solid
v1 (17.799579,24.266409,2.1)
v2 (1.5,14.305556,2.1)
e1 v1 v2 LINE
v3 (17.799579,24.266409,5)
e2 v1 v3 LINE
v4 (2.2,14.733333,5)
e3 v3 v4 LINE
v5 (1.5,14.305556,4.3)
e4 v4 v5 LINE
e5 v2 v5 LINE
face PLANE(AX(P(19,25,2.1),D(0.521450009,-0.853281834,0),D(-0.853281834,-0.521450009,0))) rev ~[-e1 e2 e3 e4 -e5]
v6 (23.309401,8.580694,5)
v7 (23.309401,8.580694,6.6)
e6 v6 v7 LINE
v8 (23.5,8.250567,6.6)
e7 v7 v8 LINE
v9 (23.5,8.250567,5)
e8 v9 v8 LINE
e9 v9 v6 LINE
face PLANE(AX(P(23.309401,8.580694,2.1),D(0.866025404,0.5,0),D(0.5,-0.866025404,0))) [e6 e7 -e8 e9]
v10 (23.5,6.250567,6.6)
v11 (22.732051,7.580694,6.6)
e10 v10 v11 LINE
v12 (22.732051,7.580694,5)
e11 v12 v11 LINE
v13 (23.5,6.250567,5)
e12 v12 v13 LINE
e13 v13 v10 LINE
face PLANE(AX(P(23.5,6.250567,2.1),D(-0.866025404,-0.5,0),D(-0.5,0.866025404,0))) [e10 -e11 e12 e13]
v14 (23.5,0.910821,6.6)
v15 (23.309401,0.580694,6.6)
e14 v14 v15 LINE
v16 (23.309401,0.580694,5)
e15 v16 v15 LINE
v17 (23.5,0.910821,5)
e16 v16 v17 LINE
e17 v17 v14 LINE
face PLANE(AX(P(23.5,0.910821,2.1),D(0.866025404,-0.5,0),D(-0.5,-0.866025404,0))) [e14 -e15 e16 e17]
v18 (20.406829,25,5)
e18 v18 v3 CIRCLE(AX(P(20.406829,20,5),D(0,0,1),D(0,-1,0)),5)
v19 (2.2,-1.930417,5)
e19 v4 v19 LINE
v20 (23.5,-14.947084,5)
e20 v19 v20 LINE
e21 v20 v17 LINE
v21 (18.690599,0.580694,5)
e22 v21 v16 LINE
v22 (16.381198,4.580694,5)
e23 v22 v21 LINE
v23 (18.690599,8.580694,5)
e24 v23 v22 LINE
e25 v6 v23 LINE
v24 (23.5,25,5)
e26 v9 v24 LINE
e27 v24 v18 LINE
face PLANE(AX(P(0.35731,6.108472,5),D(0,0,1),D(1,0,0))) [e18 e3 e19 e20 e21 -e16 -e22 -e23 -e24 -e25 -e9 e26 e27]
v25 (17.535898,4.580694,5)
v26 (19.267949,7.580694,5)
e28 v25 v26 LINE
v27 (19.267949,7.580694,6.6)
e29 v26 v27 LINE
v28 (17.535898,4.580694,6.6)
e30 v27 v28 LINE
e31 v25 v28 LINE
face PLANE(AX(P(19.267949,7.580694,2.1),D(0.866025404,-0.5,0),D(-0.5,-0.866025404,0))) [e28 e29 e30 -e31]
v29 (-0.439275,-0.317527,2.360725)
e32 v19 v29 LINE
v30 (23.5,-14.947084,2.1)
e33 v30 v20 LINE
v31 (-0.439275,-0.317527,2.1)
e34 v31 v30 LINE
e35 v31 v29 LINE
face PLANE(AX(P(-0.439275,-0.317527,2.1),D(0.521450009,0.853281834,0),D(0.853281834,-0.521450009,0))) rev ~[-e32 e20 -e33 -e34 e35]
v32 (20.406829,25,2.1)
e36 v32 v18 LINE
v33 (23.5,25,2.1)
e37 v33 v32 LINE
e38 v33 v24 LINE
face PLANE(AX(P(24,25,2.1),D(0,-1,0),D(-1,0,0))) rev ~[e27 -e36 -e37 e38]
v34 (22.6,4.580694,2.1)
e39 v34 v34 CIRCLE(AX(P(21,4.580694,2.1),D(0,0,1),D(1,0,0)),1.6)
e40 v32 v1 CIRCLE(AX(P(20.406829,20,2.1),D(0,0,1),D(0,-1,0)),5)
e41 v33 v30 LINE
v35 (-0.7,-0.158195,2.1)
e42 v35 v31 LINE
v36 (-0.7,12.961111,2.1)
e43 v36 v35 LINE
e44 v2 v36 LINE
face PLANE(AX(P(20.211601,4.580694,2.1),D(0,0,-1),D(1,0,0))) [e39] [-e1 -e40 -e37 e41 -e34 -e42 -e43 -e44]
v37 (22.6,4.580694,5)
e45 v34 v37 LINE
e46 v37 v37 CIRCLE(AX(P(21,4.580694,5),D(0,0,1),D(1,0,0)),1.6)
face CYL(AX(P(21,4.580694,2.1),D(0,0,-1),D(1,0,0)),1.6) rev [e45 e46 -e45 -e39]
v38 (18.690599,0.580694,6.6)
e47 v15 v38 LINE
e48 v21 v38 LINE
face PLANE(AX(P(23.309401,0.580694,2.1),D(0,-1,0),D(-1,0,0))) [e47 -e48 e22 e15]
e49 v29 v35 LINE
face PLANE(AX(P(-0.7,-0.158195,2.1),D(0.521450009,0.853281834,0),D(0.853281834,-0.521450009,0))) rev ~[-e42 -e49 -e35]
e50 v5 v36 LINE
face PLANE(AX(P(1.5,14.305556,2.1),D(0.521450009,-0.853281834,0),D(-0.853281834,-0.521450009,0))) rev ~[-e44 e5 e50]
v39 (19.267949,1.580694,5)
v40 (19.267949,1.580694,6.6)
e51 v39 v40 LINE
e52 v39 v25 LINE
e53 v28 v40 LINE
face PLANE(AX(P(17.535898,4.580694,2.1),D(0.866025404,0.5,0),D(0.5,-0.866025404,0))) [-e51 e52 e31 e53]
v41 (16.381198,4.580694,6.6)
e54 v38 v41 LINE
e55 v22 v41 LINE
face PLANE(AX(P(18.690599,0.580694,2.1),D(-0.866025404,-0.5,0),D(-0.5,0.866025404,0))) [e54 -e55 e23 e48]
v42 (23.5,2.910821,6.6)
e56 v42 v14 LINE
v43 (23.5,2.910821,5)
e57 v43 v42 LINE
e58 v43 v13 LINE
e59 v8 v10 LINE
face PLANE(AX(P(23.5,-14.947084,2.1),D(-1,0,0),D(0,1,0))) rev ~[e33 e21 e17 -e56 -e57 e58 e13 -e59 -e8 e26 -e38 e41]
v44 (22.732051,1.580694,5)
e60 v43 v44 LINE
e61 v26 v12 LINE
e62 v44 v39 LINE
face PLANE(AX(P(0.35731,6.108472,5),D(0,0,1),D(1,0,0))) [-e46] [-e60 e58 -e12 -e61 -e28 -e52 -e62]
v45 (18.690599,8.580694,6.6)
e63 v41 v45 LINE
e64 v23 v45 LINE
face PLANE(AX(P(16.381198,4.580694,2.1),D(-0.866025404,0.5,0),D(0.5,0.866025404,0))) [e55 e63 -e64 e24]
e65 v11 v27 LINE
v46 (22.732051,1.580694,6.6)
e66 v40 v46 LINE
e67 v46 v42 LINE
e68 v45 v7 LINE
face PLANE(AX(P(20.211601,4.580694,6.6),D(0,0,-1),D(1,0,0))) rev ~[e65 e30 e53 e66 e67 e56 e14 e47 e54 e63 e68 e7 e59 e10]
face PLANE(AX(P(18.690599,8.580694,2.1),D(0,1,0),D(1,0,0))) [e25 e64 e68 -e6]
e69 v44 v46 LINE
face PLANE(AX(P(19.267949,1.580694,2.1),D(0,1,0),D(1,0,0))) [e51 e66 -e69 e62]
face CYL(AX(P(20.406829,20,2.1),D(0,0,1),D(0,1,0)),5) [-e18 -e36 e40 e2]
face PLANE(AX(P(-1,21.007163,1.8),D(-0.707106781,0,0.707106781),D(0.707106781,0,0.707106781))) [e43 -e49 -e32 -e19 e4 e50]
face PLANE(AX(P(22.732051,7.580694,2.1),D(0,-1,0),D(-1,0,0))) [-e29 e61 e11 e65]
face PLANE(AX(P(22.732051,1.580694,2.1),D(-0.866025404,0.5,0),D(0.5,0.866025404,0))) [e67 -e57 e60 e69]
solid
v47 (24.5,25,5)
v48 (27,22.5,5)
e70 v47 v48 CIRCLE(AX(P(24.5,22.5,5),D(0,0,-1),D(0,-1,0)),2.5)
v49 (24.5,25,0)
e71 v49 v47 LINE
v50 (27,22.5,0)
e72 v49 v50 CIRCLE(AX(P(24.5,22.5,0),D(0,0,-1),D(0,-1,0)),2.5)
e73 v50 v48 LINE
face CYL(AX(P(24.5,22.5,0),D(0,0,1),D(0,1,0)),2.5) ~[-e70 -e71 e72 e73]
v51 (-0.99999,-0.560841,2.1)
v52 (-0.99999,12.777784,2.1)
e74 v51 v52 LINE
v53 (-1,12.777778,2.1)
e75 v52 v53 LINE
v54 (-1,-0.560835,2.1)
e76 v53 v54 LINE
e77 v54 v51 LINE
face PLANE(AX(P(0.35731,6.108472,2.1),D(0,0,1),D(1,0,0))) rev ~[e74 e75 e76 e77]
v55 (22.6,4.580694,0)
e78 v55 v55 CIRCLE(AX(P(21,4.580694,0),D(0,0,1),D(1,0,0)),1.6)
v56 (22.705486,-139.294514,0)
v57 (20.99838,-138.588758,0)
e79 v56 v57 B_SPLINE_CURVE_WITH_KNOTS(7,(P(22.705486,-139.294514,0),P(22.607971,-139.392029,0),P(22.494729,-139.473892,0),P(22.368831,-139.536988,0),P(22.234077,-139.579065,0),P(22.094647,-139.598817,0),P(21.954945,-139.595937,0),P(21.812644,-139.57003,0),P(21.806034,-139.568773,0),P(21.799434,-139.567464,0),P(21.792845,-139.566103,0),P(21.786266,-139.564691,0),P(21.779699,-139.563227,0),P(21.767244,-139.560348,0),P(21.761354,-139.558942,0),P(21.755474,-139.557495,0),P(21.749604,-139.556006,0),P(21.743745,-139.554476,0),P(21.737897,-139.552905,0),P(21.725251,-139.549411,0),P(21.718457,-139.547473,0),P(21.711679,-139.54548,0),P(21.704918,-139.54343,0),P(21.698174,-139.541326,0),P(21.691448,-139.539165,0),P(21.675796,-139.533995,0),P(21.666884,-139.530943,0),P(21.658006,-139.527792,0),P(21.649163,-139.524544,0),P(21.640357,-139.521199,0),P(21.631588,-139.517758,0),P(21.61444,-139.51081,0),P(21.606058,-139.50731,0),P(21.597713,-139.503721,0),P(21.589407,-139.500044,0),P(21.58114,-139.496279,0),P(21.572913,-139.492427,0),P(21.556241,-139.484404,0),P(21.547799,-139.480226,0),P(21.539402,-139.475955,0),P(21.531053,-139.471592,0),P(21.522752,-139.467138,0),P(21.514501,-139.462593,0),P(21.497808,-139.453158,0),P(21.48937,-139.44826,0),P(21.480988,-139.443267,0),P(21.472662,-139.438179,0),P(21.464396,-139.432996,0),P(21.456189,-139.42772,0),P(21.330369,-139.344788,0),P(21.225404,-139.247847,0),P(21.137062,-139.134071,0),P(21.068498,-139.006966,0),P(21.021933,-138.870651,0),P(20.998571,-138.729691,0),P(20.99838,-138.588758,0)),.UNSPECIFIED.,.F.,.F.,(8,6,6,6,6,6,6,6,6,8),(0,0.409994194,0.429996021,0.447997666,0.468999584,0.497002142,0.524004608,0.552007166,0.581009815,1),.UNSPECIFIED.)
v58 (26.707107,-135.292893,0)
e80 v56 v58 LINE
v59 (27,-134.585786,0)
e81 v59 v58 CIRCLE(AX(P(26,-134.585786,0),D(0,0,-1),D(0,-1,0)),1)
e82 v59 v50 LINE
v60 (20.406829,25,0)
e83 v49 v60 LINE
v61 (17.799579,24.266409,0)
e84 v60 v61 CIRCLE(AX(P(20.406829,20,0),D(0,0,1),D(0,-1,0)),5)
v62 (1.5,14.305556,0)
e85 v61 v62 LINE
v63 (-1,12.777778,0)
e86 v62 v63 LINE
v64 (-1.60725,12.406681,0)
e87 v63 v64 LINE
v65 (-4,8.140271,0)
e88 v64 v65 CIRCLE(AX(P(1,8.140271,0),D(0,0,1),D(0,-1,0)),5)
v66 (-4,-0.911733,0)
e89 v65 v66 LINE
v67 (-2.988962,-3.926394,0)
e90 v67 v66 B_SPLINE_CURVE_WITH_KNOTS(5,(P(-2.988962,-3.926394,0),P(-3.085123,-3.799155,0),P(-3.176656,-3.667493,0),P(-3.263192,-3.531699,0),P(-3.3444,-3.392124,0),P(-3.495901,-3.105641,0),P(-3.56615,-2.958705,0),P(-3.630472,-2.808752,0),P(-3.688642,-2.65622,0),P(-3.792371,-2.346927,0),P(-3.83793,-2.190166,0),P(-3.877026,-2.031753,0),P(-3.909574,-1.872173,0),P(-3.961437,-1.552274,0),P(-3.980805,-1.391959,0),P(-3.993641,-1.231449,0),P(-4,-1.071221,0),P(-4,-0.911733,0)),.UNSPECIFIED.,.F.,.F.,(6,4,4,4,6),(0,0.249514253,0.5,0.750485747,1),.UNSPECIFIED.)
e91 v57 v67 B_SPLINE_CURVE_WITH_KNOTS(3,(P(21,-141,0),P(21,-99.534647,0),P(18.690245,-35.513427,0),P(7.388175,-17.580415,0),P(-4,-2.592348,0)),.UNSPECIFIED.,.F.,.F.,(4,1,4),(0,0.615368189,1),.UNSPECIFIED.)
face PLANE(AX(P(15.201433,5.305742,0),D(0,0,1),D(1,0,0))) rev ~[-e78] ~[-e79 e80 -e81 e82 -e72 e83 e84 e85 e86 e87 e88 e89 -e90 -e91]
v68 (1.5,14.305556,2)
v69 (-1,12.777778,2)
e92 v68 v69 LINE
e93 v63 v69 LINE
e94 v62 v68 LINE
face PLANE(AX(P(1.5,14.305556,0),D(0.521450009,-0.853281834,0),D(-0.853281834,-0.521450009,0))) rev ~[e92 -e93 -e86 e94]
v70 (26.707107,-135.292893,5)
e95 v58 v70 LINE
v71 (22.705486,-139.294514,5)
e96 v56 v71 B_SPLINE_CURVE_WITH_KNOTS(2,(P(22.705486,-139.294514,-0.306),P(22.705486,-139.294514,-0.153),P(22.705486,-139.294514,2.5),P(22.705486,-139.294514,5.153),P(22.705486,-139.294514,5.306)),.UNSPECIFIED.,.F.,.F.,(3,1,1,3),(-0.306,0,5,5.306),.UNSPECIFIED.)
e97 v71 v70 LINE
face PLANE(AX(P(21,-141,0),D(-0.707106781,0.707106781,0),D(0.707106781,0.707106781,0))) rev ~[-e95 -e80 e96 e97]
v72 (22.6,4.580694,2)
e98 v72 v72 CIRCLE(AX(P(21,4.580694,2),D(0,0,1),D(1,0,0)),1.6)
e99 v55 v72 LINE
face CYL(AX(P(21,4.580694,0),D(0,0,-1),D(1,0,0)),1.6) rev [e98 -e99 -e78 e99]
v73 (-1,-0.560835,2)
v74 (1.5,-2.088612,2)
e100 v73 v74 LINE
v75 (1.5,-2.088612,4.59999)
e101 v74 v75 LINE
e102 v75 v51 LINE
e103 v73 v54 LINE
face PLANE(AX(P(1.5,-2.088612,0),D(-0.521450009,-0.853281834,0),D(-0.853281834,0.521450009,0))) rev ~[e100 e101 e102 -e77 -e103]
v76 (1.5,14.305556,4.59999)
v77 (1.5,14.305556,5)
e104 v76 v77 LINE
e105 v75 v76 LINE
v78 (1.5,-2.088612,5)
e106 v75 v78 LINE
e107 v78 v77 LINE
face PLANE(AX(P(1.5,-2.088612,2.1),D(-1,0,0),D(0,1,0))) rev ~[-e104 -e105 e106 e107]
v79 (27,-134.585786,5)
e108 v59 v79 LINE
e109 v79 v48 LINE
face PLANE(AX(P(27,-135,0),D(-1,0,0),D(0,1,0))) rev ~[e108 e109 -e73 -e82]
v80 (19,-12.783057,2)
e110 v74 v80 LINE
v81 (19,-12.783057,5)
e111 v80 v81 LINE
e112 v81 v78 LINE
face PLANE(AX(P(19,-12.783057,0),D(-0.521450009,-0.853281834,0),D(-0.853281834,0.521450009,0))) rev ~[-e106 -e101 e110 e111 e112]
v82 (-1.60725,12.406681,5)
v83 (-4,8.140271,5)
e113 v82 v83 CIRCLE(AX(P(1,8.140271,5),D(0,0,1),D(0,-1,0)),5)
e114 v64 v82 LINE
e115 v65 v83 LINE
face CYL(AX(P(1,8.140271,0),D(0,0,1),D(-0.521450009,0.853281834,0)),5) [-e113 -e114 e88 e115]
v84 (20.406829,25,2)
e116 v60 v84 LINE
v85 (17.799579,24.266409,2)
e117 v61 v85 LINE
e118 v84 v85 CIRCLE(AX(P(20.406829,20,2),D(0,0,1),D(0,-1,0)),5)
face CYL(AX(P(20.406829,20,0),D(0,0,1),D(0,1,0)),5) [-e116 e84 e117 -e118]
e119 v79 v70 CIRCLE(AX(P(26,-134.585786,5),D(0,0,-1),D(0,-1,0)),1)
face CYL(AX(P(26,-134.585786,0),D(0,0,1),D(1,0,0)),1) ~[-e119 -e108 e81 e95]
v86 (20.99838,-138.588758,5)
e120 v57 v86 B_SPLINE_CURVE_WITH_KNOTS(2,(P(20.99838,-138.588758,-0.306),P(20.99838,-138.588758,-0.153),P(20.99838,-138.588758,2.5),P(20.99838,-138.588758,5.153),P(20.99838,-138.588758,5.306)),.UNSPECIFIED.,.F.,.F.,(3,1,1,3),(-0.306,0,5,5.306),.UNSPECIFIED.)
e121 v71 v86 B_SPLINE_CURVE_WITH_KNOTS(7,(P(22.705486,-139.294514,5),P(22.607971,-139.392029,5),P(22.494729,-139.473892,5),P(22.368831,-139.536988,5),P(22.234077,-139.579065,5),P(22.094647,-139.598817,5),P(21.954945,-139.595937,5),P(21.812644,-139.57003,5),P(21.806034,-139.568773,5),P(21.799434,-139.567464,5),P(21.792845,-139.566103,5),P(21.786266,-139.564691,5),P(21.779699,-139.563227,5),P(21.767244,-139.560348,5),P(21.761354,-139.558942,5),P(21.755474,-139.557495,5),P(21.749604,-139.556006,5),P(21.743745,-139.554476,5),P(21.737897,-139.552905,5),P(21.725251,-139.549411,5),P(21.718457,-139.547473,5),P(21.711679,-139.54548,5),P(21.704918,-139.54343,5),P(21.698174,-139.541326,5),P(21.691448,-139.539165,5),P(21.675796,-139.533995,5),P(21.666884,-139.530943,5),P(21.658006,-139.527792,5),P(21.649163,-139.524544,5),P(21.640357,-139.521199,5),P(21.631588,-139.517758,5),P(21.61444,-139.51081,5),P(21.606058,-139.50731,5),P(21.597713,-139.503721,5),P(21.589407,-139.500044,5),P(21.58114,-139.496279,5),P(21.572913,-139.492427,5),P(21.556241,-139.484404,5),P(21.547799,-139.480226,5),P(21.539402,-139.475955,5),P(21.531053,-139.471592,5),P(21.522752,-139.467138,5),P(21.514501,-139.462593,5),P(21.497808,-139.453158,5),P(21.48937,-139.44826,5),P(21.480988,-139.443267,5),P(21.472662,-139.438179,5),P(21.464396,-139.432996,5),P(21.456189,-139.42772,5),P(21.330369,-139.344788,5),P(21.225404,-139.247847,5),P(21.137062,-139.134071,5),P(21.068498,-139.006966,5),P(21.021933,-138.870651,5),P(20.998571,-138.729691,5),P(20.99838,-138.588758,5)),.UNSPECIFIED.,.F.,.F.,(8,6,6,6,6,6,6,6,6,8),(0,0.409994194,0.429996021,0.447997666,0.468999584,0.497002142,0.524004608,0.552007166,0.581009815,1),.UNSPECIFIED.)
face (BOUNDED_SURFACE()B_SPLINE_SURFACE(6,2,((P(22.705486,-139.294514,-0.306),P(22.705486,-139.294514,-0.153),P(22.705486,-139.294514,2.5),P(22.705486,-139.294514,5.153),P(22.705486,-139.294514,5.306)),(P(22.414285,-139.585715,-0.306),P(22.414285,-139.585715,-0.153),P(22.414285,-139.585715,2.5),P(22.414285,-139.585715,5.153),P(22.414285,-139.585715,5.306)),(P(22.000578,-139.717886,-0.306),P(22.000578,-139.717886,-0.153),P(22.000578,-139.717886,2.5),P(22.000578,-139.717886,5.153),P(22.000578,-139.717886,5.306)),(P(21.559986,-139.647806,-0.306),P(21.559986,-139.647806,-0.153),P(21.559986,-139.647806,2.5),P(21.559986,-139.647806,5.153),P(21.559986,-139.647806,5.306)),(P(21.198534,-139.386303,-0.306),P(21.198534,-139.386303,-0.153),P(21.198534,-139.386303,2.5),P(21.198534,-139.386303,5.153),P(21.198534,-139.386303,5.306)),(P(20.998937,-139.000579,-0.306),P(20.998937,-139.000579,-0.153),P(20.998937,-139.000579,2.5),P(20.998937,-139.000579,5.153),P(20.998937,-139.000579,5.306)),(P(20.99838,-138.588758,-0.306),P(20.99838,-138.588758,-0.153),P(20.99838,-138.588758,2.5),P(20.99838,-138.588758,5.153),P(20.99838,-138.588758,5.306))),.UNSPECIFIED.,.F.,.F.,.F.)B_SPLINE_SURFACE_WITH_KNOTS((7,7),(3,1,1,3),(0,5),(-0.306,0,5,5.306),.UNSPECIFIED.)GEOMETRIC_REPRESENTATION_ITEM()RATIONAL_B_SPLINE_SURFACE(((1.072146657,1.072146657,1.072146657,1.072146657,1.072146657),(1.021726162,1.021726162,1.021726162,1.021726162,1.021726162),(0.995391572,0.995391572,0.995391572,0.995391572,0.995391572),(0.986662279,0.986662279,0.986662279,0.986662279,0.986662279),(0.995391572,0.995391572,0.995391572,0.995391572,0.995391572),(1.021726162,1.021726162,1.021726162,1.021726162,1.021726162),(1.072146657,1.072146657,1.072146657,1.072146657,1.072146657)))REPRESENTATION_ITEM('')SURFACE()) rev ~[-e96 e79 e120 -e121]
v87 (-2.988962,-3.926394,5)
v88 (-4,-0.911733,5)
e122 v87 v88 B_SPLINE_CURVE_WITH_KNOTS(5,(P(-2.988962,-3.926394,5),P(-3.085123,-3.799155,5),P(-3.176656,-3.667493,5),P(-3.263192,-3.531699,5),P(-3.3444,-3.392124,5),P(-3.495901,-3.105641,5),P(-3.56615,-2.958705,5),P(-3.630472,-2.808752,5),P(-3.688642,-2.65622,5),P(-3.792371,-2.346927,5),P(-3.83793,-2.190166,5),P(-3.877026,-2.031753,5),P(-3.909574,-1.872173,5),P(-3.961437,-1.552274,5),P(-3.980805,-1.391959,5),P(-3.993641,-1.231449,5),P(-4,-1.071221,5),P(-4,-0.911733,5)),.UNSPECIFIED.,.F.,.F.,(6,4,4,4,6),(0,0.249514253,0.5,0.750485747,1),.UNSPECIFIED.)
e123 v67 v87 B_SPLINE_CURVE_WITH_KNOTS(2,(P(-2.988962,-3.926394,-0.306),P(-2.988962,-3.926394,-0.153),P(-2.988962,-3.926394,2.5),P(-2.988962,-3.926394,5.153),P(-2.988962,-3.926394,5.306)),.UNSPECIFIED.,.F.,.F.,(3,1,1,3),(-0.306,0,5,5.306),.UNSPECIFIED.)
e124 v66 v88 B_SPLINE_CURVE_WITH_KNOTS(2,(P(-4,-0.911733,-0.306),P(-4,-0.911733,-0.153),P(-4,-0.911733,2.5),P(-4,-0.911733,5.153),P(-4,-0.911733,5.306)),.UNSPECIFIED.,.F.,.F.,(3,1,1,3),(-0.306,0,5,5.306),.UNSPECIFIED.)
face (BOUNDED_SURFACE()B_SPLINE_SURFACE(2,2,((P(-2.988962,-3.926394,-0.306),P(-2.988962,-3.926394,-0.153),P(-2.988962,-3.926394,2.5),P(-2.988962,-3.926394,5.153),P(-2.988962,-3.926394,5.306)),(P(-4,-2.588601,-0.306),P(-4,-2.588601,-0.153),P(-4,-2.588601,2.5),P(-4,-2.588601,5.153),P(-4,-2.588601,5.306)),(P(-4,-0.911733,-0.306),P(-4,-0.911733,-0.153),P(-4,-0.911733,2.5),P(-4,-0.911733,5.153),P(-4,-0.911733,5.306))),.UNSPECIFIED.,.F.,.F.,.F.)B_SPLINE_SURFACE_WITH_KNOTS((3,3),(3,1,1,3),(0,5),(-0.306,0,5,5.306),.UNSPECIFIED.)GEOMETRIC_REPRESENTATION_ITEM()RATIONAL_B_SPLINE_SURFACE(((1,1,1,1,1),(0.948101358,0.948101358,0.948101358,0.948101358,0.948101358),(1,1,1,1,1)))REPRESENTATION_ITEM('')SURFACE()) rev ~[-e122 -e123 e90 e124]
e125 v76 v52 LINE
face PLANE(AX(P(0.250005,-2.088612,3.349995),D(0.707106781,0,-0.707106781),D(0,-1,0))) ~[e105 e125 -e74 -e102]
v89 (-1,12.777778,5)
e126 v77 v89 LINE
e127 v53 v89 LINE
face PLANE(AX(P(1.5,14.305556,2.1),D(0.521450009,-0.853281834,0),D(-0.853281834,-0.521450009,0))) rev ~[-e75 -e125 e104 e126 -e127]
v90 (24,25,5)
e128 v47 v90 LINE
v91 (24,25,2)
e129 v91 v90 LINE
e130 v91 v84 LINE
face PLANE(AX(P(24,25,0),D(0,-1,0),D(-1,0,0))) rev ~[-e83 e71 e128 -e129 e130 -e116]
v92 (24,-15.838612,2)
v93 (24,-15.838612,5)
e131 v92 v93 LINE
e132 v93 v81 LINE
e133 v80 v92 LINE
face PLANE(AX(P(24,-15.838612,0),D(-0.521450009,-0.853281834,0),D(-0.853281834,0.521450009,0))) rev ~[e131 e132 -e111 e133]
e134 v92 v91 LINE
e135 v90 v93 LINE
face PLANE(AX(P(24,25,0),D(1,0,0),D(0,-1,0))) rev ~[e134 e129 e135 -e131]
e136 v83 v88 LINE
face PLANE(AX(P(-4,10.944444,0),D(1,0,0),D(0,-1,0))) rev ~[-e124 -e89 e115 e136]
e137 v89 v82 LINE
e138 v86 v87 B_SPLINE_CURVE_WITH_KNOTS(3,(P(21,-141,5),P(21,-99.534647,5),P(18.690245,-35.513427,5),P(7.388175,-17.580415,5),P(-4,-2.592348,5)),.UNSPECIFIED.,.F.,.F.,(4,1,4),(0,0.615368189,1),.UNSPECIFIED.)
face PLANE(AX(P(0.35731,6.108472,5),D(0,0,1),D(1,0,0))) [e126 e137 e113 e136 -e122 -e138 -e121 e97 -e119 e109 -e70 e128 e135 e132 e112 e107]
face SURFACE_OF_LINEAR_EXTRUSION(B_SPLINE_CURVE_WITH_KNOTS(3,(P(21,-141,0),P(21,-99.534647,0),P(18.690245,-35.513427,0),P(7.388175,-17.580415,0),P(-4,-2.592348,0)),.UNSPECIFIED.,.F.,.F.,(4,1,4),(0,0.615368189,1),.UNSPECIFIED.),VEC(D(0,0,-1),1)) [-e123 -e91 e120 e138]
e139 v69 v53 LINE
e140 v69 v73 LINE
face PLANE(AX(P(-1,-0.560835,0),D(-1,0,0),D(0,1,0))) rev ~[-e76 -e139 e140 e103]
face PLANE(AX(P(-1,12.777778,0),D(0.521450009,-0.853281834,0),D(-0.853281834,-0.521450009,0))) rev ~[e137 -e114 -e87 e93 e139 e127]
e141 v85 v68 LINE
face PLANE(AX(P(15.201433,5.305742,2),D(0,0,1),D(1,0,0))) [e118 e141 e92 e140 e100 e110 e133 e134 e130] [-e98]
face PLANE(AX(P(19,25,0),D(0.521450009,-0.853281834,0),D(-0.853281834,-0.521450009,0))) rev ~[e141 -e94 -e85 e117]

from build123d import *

# Parameters (mm, degrees)
F0_R        = 1.6
F1_DEPTH    = 2
F2_DEPTH    = 5
F3_START    = 2.1
F3_DEPTH    = 2.9
F4_SIZE     = 2.49999
F5_R        = 5
F6_R        = 2.5
F7_R        = 1
F8_START    = 2.1
F8_DEPTH    = 2.9
F9_T1_DEPTH = 29.797383518
F11_DEPTH   = 2.9
F12_DEPTH   = 4.5
F13_R       = 5


# Not quite as in the source:
# - a fillet or chamfer that OpenCascade refuses, or shapes differently, is made with other operations: its cross-section is extruded or revolved along the edge and cut away or added
# - a fillet or chamfer is up to 0.001 mm smaller than in the source, because OpenCascade refuses the exact size


with BuildPart() as f1:
    # F0 (on Top) → F1 (new body)
    with BuildSketch(Plane.XY):
        Polygon((1.5, 14.3055555556), (1.5, -2.088612395), (19, -12.7830568394), (24, -15.838612395), (24, 25), (19, 25), align=None)
        with Locations((21, 4.5806938025)):
            Circle(F0_R, mode=Mode.SUBTRACT)
        Polygon((-1, 12.7777777778), (-1, -0.5608346172), (1.5, -2.088612395), (1.5, 14.3055555556), align=None)
    extrude(amount=F1_DEPTH)

    # F0 (on Top) → F2 (join)
    with BuildSketch(Plane.XY):
        with BuildLine():
            Line((1.5, -2.088612395), (-1, -0.5608346172))
            Line((-1, -0.5608346172), (-1, 12.7777777778))
            Line((-1, 12.7777777778), (-4, 10.9444444444))
            Line((-4, 10.9444444444), (-4, -2.5923480172))
            add(Edge.make_bspline(
                [(21, -141), (21, -99.5346466722), (18.6902447603, -35.5134267653), (7.388175394, -17.5804150979), (-4, -2.5923480172)],
                knots=[0, 0, 0, 0, 0.6153681888, 1, 1, 1, 1], degree=3))
            Line((21, -141), (27, -135))
            Line((27, -135), (27, 25))
            Line((27, 25), (24, 25))
            Line((24, 25), (24, -15.838612395))
            Line((24, -15.838612395), (19, -12.7830568394))
            Line((19, -12.7830568394), (1.5, -2.088612395))
        make_face()
    extrude(amount=F2_DEPTH)

    # F0 (on Top) → F3 (join)
    with BuildSketch(Plane.XY.offset(F3_START)):
        Polygon((-1, 12.7777777778), (-1, -0.5608346172), (1.5, -2.088612395), (1.5, 14.3055555556), align=None)
    extrude(amount=F3_DEPTH)

    # F4 (size 2.5 in the source; OpenCascade refuses exactly that, so slightly less here)
    f4_edges = [f1.edges().sort_by_distance(p)[0] for p in [
        (1.5, 6.108472, 2.1),
    ]]
    chamfer(f4_edges, length=F4_SIZE)

    # F5
    f5_edges = [f1.edges().sort_by_distance(p)[0] for p in [
        (-4, 10.944444, 2.5),
        (19, 25, 1),
        (-4, -2.592348, 2.5),
    ]]
    fillet(f5_edges, radius=F5_R)

    # F6
    f6_edges = [f1.edges().sort_by_distance(p)[0] for p in [
        (27, 25, 2.5),
    ]]
    fillet(f6_edges, radius=F6_R)

    # F7
    f7_edges = [f1.edges().sort_by_distance(p)[0] for p in [
        (27, -135, 2.5),
        (21, -141, 2.5),
    ]]
    fillet(f7_edges, radius=F7_R)


with BuildPart() as f8:
    # F0 (on Top) → F8 (new body)
    with BuildSketch(Plane.XY.offset(F8_START)):
        Polygon((-1, 12.7777777778), (-1, -0.5608346172), (1.5, -2.088612395), (1.5, 14.3055555556), align=None)
        Polygon((1.5, 14.3055555556), (1.5, -2.088612395), (19, -12.7830568394), (24, -15.838612395), (24, 25), (19, 25), align=None)
        with Locations((21, 4.5806938025)):
            Circle(F0_R, mode=Mode.SUBTRACT)
    extrude(amount=F8_DEPTH)

    # F9: chamfer of 3.2 on 1 edges, made by hand

    # F9_s2 → F9_t1 (cut)
    with BuildSketch(Plane.XZ.offset(-21.0071633393)):
        Polygon((-1, 1.8), (2.2, 5), (-1, 5), align=None)
    extrude(amount=F9_T1_DEPTH, mode=Mode.SUBTRACT)

    # F10 (on face) → F11 (cut, through all)
    with BuildSketch(Plane(origin=(0, 0, 2.1), x_dir=(1, 0, 0), z_dir=(0, 0, -1))):
        Polygon((24, -1.7768462252), (24, 15.838612395), (-0.7, 0.7441679505), (-0.7, 0.1581950864), (-0.4392749953, 0.3175270337), (23.5, 14.9470839753), (23.5, -0.9108208214), align=None)
        Polygon((24, -25), (24, -7.3845413798), (23.5, -8.2505667836), (23.5, -25), align=None)
        Polygon((24, -3.7768462252), (24, -1.7768462252), (23.5, -0.9108208214), (23.5, -2.9108208214), align=None)
        Polygon((24, -7.3845413798), (24, -5.3845413798), (23.5, -6.2505667836), (23.5, -8.2505667836), align=None)
        Polygon((24, -5.3845413798), (24, -3.7768462252), (23.5, -2.9108208214), (23.5, -6.2505667836), align=None)
    extrude(amount=-F11_DEPTH, mode=Mode.SUBTRACT)

    # F10 (on face) → F12 (join)
    with BuildSketch(Plane(origin=(0, 0, 2.1), x_dir=(1, 0, 0), z_dir=(0, 0, -1))):
        Polygon((23.5, -2.9108208214), (23.5, -0.9108208214), (23.3094010768, -0.5806938025), (18.6905989232, -0.5806938025), (16.3811978465, -4.5806938025), (18.6905989232, -8.5806938025), (23.3094010768, -8.5806938025), (23.5, -8.2505667836), (23.5, -6.2505667836), (22.7320508076, -7.5806938025), (19.2679491924, -7.5806938025), (17.5358983849, -4.5806938025), (19.2679491924, -1.5806938025), (22.7320508076, -1.5806938025), align=None)
    extrude(amount=-F12_DEPTH)

    # F13
    f13_edges = [f8.edges().sort_by_distance(p)[0] for p in [
        (19, 25, 3.55),
    ]]
    fillet(f13_edges, radius=F13_R)


solid = Compound([f1.part, f8.part])
